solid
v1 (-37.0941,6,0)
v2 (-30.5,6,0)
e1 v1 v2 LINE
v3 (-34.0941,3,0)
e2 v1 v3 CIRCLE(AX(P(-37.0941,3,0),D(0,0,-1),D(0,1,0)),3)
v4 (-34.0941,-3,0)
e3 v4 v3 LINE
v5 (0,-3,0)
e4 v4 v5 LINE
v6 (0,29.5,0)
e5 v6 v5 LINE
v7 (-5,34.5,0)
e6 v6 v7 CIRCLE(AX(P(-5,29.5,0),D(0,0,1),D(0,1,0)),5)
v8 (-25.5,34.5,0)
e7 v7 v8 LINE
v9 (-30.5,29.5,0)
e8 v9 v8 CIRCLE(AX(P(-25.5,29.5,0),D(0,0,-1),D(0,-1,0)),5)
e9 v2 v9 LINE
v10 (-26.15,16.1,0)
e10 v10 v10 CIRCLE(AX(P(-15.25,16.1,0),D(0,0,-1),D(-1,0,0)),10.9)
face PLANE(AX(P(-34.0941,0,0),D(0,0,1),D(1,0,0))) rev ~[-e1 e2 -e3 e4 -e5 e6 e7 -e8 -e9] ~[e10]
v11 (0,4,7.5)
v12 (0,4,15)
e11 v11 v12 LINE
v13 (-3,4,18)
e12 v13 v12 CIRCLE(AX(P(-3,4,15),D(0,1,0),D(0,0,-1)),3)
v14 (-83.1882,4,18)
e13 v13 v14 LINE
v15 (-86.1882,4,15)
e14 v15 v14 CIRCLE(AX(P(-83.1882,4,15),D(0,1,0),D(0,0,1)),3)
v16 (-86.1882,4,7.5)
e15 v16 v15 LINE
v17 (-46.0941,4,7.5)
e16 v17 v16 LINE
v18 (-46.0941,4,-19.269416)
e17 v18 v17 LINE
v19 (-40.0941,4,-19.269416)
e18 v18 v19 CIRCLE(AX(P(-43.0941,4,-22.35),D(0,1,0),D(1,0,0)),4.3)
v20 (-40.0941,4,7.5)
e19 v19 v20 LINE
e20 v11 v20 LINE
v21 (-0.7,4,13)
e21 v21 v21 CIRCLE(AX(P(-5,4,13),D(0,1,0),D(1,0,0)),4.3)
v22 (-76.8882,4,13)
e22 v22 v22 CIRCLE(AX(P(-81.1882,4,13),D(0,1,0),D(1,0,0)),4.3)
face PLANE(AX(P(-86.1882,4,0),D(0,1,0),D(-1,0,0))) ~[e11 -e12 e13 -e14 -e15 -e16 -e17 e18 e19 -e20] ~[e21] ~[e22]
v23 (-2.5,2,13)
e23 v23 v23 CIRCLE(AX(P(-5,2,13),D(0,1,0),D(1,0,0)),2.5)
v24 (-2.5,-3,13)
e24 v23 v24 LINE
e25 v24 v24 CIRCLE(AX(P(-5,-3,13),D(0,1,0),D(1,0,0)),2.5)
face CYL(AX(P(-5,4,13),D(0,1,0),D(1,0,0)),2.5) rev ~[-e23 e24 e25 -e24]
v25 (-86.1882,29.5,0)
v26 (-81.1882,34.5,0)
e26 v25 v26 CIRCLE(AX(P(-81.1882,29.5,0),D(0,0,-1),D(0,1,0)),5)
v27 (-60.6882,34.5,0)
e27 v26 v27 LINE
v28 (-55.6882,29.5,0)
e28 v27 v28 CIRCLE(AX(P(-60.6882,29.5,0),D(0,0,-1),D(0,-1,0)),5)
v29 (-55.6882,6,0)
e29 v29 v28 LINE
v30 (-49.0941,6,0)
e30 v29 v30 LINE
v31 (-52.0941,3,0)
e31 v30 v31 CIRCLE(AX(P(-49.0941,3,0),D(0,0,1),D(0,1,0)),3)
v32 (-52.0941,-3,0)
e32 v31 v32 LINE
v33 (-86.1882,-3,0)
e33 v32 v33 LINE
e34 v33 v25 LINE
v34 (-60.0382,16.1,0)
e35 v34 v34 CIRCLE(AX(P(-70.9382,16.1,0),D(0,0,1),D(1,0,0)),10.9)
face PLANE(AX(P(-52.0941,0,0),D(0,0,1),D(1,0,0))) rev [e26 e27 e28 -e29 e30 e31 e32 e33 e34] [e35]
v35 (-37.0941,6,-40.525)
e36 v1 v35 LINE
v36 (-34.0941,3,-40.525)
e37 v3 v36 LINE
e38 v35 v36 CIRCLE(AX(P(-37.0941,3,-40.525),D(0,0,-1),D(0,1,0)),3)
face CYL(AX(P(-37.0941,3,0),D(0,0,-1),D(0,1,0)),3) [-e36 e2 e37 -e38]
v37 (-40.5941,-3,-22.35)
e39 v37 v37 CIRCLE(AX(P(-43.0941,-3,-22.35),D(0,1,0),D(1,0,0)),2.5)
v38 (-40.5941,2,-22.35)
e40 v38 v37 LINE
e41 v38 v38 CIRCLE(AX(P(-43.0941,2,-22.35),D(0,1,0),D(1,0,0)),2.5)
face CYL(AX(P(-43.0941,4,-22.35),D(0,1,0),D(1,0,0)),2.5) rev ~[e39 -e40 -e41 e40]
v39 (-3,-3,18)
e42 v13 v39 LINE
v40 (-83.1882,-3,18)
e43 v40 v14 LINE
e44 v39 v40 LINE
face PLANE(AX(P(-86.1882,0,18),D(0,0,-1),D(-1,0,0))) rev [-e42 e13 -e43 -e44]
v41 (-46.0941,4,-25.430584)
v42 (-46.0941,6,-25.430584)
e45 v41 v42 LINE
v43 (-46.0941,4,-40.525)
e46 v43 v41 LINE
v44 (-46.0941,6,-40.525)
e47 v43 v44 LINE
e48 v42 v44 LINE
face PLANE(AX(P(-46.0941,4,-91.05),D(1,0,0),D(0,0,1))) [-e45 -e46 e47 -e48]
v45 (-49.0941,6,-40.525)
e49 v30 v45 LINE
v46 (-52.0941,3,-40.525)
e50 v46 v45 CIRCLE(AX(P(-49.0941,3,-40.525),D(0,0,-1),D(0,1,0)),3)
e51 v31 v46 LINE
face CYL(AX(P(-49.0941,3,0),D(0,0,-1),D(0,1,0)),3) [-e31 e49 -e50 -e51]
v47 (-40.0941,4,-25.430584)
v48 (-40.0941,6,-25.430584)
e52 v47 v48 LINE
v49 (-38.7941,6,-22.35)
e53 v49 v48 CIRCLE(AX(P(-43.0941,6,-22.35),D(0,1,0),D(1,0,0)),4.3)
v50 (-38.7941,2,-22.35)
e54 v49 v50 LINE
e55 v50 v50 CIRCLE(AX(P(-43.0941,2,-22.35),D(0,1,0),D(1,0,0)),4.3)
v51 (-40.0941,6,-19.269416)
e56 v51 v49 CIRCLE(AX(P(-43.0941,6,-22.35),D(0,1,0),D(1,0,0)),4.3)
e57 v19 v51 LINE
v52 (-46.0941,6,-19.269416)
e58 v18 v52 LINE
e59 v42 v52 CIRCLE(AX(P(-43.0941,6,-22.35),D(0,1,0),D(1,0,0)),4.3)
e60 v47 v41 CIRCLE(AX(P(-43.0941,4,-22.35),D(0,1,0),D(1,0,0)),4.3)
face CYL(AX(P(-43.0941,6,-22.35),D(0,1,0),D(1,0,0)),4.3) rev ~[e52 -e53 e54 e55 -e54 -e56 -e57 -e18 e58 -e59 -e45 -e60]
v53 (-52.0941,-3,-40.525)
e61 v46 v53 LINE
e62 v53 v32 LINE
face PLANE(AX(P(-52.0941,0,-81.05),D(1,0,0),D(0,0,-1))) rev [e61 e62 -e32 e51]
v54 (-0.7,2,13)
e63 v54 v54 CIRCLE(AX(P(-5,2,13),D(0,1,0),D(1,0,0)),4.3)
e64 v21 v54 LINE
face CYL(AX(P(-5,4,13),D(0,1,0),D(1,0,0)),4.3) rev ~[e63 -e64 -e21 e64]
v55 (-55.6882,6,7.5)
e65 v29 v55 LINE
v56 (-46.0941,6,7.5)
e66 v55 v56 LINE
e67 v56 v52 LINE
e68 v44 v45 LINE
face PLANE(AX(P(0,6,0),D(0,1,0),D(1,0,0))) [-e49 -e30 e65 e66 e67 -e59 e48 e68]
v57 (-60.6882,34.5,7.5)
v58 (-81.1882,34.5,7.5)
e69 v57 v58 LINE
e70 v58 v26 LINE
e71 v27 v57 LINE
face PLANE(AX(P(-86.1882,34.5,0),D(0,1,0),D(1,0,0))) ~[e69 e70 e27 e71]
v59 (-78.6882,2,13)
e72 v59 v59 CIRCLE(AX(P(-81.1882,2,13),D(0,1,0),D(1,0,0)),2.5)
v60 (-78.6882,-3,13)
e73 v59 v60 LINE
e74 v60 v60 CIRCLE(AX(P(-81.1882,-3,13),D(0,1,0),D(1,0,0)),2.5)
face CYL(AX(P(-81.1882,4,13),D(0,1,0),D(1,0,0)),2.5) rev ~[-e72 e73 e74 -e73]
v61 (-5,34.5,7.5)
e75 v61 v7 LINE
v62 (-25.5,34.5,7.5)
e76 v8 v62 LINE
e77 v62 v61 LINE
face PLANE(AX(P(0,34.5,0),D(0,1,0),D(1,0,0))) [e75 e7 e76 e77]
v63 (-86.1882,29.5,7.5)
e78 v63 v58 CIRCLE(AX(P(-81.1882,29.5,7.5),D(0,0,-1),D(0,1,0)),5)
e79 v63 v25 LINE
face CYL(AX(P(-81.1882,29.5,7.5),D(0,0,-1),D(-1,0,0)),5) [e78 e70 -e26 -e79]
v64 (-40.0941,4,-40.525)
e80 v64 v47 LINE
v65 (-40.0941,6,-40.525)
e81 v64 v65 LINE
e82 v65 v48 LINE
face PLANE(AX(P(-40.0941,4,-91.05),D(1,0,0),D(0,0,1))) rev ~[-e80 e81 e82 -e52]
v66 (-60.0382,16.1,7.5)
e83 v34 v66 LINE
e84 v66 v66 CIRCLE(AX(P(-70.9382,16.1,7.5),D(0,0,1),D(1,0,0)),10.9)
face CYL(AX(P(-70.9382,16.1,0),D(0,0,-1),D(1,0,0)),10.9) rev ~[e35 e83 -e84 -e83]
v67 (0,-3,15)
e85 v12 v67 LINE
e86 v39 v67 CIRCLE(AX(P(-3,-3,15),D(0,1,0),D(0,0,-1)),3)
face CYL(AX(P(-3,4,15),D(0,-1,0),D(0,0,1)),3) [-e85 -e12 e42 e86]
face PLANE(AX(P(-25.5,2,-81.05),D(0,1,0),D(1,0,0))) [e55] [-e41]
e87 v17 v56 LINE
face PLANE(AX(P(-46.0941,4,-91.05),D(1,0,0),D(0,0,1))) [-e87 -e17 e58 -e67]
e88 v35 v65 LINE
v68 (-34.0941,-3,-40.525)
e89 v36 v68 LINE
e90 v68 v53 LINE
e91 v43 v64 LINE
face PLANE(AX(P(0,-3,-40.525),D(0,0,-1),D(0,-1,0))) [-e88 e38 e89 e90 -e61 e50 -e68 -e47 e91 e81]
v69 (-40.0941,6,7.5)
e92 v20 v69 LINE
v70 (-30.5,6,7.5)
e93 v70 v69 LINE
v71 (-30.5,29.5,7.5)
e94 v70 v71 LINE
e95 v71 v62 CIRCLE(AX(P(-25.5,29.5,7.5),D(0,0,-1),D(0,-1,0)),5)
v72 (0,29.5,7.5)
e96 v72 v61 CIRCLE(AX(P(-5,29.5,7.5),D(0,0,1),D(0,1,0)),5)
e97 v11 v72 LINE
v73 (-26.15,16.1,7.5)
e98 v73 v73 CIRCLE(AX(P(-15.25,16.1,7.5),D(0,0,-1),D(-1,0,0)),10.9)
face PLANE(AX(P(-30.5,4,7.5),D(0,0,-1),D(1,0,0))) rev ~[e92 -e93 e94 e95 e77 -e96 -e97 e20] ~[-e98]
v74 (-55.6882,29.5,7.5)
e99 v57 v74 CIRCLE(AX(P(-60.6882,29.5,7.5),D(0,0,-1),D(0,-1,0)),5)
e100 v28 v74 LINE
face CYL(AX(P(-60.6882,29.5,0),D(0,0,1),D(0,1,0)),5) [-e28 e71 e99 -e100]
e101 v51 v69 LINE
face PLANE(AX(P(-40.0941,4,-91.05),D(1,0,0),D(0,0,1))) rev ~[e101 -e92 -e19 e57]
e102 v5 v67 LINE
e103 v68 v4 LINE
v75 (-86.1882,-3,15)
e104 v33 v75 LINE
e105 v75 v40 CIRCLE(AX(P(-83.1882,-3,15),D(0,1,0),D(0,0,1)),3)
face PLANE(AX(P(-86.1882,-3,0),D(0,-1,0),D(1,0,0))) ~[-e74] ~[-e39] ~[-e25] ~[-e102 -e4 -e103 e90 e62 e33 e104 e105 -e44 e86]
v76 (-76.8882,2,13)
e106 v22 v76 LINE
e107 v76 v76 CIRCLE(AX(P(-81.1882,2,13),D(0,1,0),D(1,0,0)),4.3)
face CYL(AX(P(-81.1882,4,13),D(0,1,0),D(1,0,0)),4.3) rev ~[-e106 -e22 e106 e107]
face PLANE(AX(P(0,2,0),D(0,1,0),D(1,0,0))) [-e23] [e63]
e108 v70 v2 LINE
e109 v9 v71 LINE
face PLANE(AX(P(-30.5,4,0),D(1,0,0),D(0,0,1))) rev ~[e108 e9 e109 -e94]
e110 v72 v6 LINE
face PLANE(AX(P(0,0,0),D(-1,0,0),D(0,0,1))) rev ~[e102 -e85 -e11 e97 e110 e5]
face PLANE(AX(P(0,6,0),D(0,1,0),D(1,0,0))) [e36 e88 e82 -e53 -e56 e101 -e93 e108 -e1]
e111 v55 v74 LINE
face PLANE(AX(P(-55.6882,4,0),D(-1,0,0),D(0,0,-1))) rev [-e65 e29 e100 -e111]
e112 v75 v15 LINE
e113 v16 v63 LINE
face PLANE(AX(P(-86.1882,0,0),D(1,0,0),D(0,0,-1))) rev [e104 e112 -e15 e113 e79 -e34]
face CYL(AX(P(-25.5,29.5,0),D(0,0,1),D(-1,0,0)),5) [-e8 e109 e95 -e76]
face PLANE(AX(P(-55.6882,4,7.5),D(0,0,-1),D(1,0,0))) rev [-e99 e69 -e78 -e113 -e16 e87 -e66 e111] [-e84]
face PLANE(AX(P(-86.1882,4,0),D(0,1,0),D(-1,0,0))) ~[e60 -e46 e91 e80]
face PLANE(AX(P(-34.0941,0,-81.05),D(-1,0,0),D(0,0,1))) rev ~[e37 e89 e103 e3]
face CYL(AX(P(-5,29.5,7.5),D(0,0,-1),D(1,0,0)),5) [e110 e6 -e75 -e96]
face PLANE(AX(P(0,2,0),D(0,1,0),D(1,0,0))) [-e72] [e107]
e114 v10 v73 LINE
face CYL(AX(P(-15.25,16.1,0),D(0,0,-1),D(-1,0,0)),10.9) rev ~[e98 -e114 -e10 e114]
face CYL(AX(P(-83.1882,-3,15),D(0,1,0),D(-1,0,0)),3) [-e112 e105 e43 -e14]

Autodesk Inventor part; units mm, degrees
ref_plane "YZ Plane" through (0, 0, 0) normal (1, 0, 0) x (0, 1, 0)
ref_plane "XZ Plane" through (0, 0, 0) normal (0, 1, 0) x (-1, 0, 0)
sketch "Boceto1" plane through (0, 0, 0) normal (0, 1, 0) x (-1, 0, 0)
  line L0 (0, 0) -> (0, 18)
  line L1 (0, 18) -> (43.0941, 18)
  line L2 (43.0941, 18) -> (43.0941, -103.05)
  line L3 (43.0941, -103.05) -> (0, -103.05)
  line L4 (0, -103.05) -> (0, -81.05)
  line L5 (0, -81.05) -> (34.0941, -81.05)
  line L6 (34.0941, -81.05) -> (34.0941, 0)
  line L7 (34.0941, 0) -> (0, 0)
  dimension "acople_hombro_largo_agujero" = 81.05
  dimension "d1" = 9
  dimension "acople_hombro_grosor_trasero" = 18
  dimension "acople_hombro_ancho_agujero" = 34.0941
  dimension "acople_hombro_grosor_frontal" = 22
extrude "Extrusión1" add sketch "Boceto1" along normal blind 4
sketch "Boceto2" plane through (0, 4, 0) normal (0, 1, 0) x (1, 0, 0)
  line L0 (0, -18) -> (0, 0) projected
  line L1 (0, 0) -> (-30.5, 0)
  line L2 (-30.5, 0) -> (-30.5, -7.5)
  line L3 (-30.5, -7.5) -> (0, -7.5)
  line L4 (0, -7.5) -> (0, 0)
  point P0 (0, 81.05)
  dimension "d6" = 30.5
  dimension "grosor_seccion_agujero_circular" = 7.5
sketch "Boceto3" plane through (0, 4, 0) normal (0, 1, 0) x (1, 0, 0)
  line L0 (0, 81.05) -> (-30.5, 81.05)
  line L1 (-30.5, 81.05) -> (-30.5, 96.05)
  line L2 (-30.5, 96.05) -> (0, 96.05)
  line L3 (0, 96.05) -> (0, 81.05)
  line L4 (-30.5, 0) -> (-30.5, -7.5) projected
  point P0 (0, 0)
  dimension "grosor_sección_agujero_servo" = 15
  dimension "d21" = 30.5
extrude "Extrusión2" add sketch "Boceto3" along normal blind 50.5
sketch "Boceto4" plane through (-34.0941, 0, -81.05) normal (0, 0, 1) x (1, 0, 0)
  line L0 (8.5941, 46.5) -> (29.0941, 46.5)
  line L1 (29.0941, 46.5) -> (29.0941, 6)
  line L2 (29.0941, 6) -> (8.5941, 6)
  line L3 (8.5941, 6) -> (8.5941, 46.5)
  line L4 (34.0941, 0) -> (0, 0) projected
  line L5 (34.0941, 0) -> (34.0941, 54.5) projected
  line L6 (3.5941, 54.5) -> (34.0941, 54.5) projected
  line L7 (3.5941, 4) -> (3.5941, 54.5) projected
  line L8 (0, 0) -> (0, 4) projected
  circle A0 centre (13.5941, 2.05) radius 1
  circle A1 centre (24.0941, 2.05) radius 1
  circle A2 centre (13.5941, 50.45) radius 1
  circle A3 centre (24.0941, 50.45) radius 1
  line L9 (0, 4) -> (3.5941, 4) projected
  point P0 (34.0941, 0)
  dimension "d12" = 40.5
  dimension "d13" = 20.5
  dimension "d14" = 2
  dimension "d15" = 3.95
  dimension "d16" = 3.95
  dimension "d17" = 5
  dimension "d18" = 5
  dimension "d19" = 2.05
  dimension "d20" = 5
  dimension "d22" = 30.5
  dimension "d23" = 54.5
  dimension "d24" = 48.4
sketch "Boceto5" plane through (-34.0941, 0, -81.05) normal (0, 0, 1) x (1, 0, 0)
  circle A0 centre (13.5941, 50.45) radius 1 projected
  circle A1 centre (24.0941, 50.45) radius 1 projected
  circle A2 centre (13.5941, 2.05) radius 1 projected
  circle A3 centre (24.0941, 2.05) radius 1 projected
  point P0 (34.0941, 0)
extrude "Extrusión3" cut sketch "Boceto4" against normal up to surface (15 mm away) contours L0 L1 L2 L3
extrude "Extrusión4" cut sketch "Boceto5" against normal up to surface (15 mm away)
extrude "Extrusión5" add sketch "Boceto2" along normal blind 30.5
ref_plane "Plano de trabajo2" through (-25.5, 6, -88.55) normal (0, 1, 0) x (1, 0, 0)
sketch "Boceto6" plane through (0, 0, 0) normal (0, 0, -1) x (-1, 0, 0)
  circle A0 centre (15.25, 16.1) radius 10.9
  line L0 (0, 34.5) -> (30.5, 34.5) projected
  point P0 (0, 0)
  point P1 (0, 6)
  point P2 (15.25, 34.5)
  dimension "d31" = 10.1
  dimension "d32" = 21.8
extrude "Extrusión6" cut sketch "Boceto6" against normal up to surface (7.5 mm away)
sketch "Boceto7" plane through (0, 4, -96.05) normal (0, 0, -1) x (-1, 0, 0)
  line L0 (0, 0) -> (43.0941, 0) projected
  line L1 (30.5, 0) -> (30.5, 50.5) projected
  line L2 (0, 0) -> (30.5, 0)
  line L3 (30.5, 0) -> (30.5, 2)
  line L4 (30.5, 2) -> (0, 2)
  line L5 (0, 2) -> (0, 0)
  line L6 (25.5, 2) -> (5, 2) projected
  point P0 (0, -4)
extrude "Extrusión7" add sketch "Boceto7" along normal up to surface (7 mm away)
sketch "Sketch13" plane through (0, 0, 0) normal (0, -1, 0) x (1, 0, 0)
  line L0 (0, 0) -> (0, 18) projected
  line L1 (0, 18) -> (-43.0941, 18) projected
  line L2 (-43.0941, 18) -> (-43.0941, -103.05) projected
  line L3 (-43.0941, -103.05) -> (0, -103.05) projected
  line L4 (0, -103.05) -> (0, -81.05) projected
  line L5 (0, -81.05) -> (-34.0941, -81.05) projected
  line L6 (-34.0941, -81.05) -> (-34.0941, 0) projected
  line L7 (-34.0941, 0) -> (0, 0) projected
extrude "Extrusion14" add sketch "Sketch13" along normal blind 3
mirror "Mirror2" about plane through (-43.0941, 0, -103.05) normal (-1, 0, 0) of "Extrusión1", "Extrusión2", "Extrusión3", "Extrusión4", "Extrusión5", "Extrusión6", "Extrusión7", "Extrusion14"
sketch "Sketch14" plane through (0, 4, 0) normal (0, 1, 0) x (1, 0, 0)
  line L0 (-30.5, 96.05) -> (-30.5, 103.05) projected
  line L1 (-30.5, 81.05) -> (-30.5, 103.05)
  line L2 (-55.6882, 96.05) -> (-55.6882, 103.05) projected
  line L3 (-30.5, 103.05) -> (-55.6882, 103.05)
  line L4 (-55.6882, 103.05) -> (-55.6882, 81.05)
  line L5 (-86.1882, 81.05) -> (-52.0941, 81.05) projected
  line L6 (-52.0941, 0) -> (-52.0941, 81.05) projected
  line L7 (-52.0941, 81.05) -> (-52.0941, 0)
  line L8 (-52.0941, 0) -> (-46.0941, 0)
  line L9 (-46.0941, 91.05) -> (-40.0941, 91.05)
  line L10 (-34.0941, 0) -> (-34.0941, 81.05)
  line L11 (-34.0941, 81.05) -> (-30.5, 81.05)
  line L12 (0, 81.05) -> (-34.0941, 81.05) projected
  line L13 (-34.0941, 0) -> (-34.0941, 81.05) projected
  line L14 (-30.5, 0) -> (-34.0941, 0) projected
  line L15 (-34.0941, 0) -> (-30.5, 0)
  line L16 (-30.5, -7.5) -> (-30.5, 0) projected
  line L17 (-30.5, 0) -> (-30.5, -7.5)
  line L18 (-30.5, -7.5) -> (-40.0941, -7.5)
  line L19 (-40.0941, 91.05) -> (-40.0941, -7.5)
  line L20 (-52.0941, 0) -> (-55.6882, 0)
  line L21 (-52.0941, 0) -> (-86.1882, 0) projected
  line L22 (-55.6882, 0) -> (-55.6882, -7.5) projected
  line L23 (-55.6882, -7.5) -> (-46.0941, -7.5)
  line L24 (-46.0941, 91.05) -> (-46.0941, -7.5)
  line L25 (-55.6882, -7.5) -> (-86.1882, -7.5) projected
  line L26 (-55.6882, -7.5) -> (-55.6882, 0)
  point P0 (0, 0)
  dimension "d65" = 12
  dimension "d66" = 6
  dimension "d68" = 6
  dimension "d69" = 18
extrude "Extrusion15" add sketch "Sketch14" along normal up to surface (2 mm away)
sketch "Sketch15" plane through (0, 4, 0) normal (0, 1, 0) x (1, 0, 0)
  circle A0 centre (-5, -13) radius 2.5
  circle A1 centre (-43.0941, 62.7) radius 2.5
  circle A2 centre (-43.0941, 22.35) radius 2.5
  circle A3 centre (-81.1882, -13) radius 2.5
  line L0 (-46.0941, 91.05) -> (-40.0941, 91.05) projected
  line L1 (0, -18) -> (-86.1882, -18) projected
  line L2 (0, -18) -> (0, -7.5) projected
  line L3 (-86.1882, -18) -> (-86.1882, -7.5) projected
  line L4 (0, 103.05) -> (-86.1882, 103.05) projected
  line L5 (-86.1882, 0) -> (-55.6882, 0) projected
  point P0 (0, 0)
  point P1 (-43.0941, 91.05)
  point P2 (0, 101.05)
  point P3 (-86.1882, 101.05)
  point P4 (-86.1882, 103.05)
  dimension "diametro_tornillo" = 5
  dimension "d73" = 5
  dimension "dist_agujero_trasero_a_lado" = 5
  dimension "d76" = 5
  dimension "d77" = 121.05
  dimension "dist_agujero_central_a_frente" = 40.35
  dimension "d79" = 40.35
  dimension "dist_agujero_trasero_a_frente" = 13
extrude "Extrusion16" cut sketch "Sketch15" along normal mid plane 20
sketch "Sketch16" plane through (0, 4, 0) normal (0, 1, 0) x (1, 0, 0)
  circle A0 centre (-5, -13) radius 2.5 projected
  circle A1 centre (-81.1882, -13) radius 2.5 projected
  circle A2 centre (-81.1882, -13) radius 4.3
  circle A3 centre (-5, -13) radius 2.5 projected
  circle A4 centre (-5, -13) radius 4.3
  point P0 (0, 0)
  dimension "diametro_cabeza_tornillo" = 8.6
extrude "Extrusion17" cut sketch "Sketch16" against normal blind 2
sketch "Sketch17" plane through (-25.5, 6, -81.05) normal (0, 1, 0) x (1, 0, 0)
  circle A0 centre (-17.5941, -18.35) radius 2.5 projected
  circle A1 centre (-17.5941, -18.35) radius 4.3
  circle A2 centre (-17.5941, -58.7) radius 2.5 projected
  circle A3 centre (-17.5941, -58.7) radius 4.3
  circle A4 centre (20.5, -94.05) radius 2.5 projected
  circle A5 centre (20.5, -94.05) radius 4.3 projected
  point P0 (25.5, -81.05)
  dimension "d85" = 8.6
  dimension "d86" = 8.6
extrude "Extrusion18" cut sketch "Sketch17" against normal blind 4 contours A1 | A3
sketch "Sketch18" plane through (-25.5, 6, -81.05) normal (0, 1, 0) x (1, 0, 0)
  circle A0 centre (10.25, 14) radius 2.5
  circle A1 centre (-45.4382, 14) radius 2.5
  circle A2 centre (20.5, -94.05) radius 2.5 projected
  circle A3 centre (-17.5941, -58.7) radius 2.5 projected
  line L0 (20.5, 0) -> (0, 0) projected
  line L1 (25.5, 22) -> (25.5, 0) projected
  line L2 (-35.1882, 0) -> (-55.6882, 0) projected
  line L3 (25.5, 22) -> (-60.6882, 22) projected
  point P0 (25.5, -81.05)
  point P1 (10.25, 0)
  point P2 (-45.4382, 0)
  point P3 (-60.6882, 20)
  point P4 (-60.6882, 22)
  dimension "dist_agujero_frontal_a_frente" = 8
  dimension "dist_agujero_frontal_a_lateral" = 15.25
extrude "Extrusion19" cut sketch "Sketch18" against normal up to surface (9 mm away) contours A0 | A1
sketch "Sketch19" plane through (-25.5, 6, -81.05) normal (0, 1, 0) x (1, 0, 0)
  circle A0 centre (10.25, 14) radius 2.5 projected
  circle A1 centre (-45.4382, 14) radius 2.5 projected
  circle A2 centre (10.25, 14) radius 4.3
  circle A3 centre (-45.4382, 14) radius 4.3
  circle A4 centre (20.5, -94.05) radius 4.3 projected
  point P0 (25.5, -81.05)
  dimension "d91" = 8.6
  dimension "d98" = 8.6
extrude "Extrusion20" cut sketch "Sketch19" against normal blind 4.5 contours A2 | A3
fillet "Fillet3" radius 3 4 edges at (-86.1882, 1.5, -103.05) (-86.1882, 0.5, 18) (0, 0.5, 18) (0, 1.5, -103.05)
fillet "Fillet3" radius 5 8 edges at (-55.6882, 34.5, 3.75) (-86.1882, 34.5, 3.75) (-86.1882, 54.5, -88.55) (-55.6882, 54.5, -88.55) (-30.5, 54.5, -88.55) (0, 54.5, -88.55) (0, 34.5, 3.75) (-30.5, 34.5, 3.75)
fillet "Fillet3" radius 3 2 edges at (-34.0941, 6, -40.525) (-52.0941, 6, -40.525)
sketch "Sketch20" plane through (0, 4, 0) normal (0, 1, 0) x (1, 0, 0)
  line L0 (-86.1882, -15) -> (-86.1882, -7.5) projected
  line L1 (0, -15) -> (0, -7.5) projected
  line L2 (-3, -18) -> (-83.1882, -18) projected
  line L3 (-5, 0) -> (-25.5, 0) projected
  point P0 (0, 0)
  dimension "ancho_acople_hombros" = 86.188
sketch "Sketch21" plane through (0, -3, 0) normal (0, 0, -1) x (-1, 0, 0)
  line L0 (3, 0) -> (83.1882, 0) projected
  line L1 (5, 37.5) -> (25.5, 37.5) projected
  point P0 (0, 3)
  dimension "altura_acople_circular" = 37.5
ref_plane "Work Plane4" through (0, -3, -40.525) normal (0, 0, 1) x (1, 0, 0)
ref_plane "Work Plane3" through (0, -3, -81.05) normal (0, 0, 1) x (1, 0, 0)
split "Split1" plane through (0, -3, -40.525) removes the side toward (0, 0, -1)
equation "\"d6\" = d21"
equation "\"grosor_sección_agujero_servo\" = 2 * grosor_seccion_agujero_circular"
equation "\"d12\" = largo_servo"
equation "\"d13\" = ancho_servo"
equation "\"d16\" = d15"
equation "\"d18\" = d17"
equation "\"d19\" = -0.5 * d24 - 0.5 * d14 + 0.5 * d23"
equation "\"d20\" = -0.5 * ancho_servo + 0.5 * d22"
equation "\"d29\" = d6"
equation "\"d33\" = d6"
equation "\"d35\" = d6"
equation "\"d66\" = 0.333333 * d69"
equation "\"d68\" = d66"
equation "\"d76\" = dist_agujero_trasero_a_lado"
equation "\"dist_agujero_central_a_frente\" = 0.333333 * d77"
equation "\"d79\" = dist_agujero_central_a_frente"
equation "\"d86\" = d85"
equation "\"d91\" = d98"
equation "\"ancho_hombro\" = 61.05"
equation "\"d104\" = 0.5 * acople_hombro_largo_agujero"
equation "\"largo_servo\" = 40.5"
equation "\"ancho_servo\" = 20.5"
properties part number "Cuerpo - Acople Hombro"
